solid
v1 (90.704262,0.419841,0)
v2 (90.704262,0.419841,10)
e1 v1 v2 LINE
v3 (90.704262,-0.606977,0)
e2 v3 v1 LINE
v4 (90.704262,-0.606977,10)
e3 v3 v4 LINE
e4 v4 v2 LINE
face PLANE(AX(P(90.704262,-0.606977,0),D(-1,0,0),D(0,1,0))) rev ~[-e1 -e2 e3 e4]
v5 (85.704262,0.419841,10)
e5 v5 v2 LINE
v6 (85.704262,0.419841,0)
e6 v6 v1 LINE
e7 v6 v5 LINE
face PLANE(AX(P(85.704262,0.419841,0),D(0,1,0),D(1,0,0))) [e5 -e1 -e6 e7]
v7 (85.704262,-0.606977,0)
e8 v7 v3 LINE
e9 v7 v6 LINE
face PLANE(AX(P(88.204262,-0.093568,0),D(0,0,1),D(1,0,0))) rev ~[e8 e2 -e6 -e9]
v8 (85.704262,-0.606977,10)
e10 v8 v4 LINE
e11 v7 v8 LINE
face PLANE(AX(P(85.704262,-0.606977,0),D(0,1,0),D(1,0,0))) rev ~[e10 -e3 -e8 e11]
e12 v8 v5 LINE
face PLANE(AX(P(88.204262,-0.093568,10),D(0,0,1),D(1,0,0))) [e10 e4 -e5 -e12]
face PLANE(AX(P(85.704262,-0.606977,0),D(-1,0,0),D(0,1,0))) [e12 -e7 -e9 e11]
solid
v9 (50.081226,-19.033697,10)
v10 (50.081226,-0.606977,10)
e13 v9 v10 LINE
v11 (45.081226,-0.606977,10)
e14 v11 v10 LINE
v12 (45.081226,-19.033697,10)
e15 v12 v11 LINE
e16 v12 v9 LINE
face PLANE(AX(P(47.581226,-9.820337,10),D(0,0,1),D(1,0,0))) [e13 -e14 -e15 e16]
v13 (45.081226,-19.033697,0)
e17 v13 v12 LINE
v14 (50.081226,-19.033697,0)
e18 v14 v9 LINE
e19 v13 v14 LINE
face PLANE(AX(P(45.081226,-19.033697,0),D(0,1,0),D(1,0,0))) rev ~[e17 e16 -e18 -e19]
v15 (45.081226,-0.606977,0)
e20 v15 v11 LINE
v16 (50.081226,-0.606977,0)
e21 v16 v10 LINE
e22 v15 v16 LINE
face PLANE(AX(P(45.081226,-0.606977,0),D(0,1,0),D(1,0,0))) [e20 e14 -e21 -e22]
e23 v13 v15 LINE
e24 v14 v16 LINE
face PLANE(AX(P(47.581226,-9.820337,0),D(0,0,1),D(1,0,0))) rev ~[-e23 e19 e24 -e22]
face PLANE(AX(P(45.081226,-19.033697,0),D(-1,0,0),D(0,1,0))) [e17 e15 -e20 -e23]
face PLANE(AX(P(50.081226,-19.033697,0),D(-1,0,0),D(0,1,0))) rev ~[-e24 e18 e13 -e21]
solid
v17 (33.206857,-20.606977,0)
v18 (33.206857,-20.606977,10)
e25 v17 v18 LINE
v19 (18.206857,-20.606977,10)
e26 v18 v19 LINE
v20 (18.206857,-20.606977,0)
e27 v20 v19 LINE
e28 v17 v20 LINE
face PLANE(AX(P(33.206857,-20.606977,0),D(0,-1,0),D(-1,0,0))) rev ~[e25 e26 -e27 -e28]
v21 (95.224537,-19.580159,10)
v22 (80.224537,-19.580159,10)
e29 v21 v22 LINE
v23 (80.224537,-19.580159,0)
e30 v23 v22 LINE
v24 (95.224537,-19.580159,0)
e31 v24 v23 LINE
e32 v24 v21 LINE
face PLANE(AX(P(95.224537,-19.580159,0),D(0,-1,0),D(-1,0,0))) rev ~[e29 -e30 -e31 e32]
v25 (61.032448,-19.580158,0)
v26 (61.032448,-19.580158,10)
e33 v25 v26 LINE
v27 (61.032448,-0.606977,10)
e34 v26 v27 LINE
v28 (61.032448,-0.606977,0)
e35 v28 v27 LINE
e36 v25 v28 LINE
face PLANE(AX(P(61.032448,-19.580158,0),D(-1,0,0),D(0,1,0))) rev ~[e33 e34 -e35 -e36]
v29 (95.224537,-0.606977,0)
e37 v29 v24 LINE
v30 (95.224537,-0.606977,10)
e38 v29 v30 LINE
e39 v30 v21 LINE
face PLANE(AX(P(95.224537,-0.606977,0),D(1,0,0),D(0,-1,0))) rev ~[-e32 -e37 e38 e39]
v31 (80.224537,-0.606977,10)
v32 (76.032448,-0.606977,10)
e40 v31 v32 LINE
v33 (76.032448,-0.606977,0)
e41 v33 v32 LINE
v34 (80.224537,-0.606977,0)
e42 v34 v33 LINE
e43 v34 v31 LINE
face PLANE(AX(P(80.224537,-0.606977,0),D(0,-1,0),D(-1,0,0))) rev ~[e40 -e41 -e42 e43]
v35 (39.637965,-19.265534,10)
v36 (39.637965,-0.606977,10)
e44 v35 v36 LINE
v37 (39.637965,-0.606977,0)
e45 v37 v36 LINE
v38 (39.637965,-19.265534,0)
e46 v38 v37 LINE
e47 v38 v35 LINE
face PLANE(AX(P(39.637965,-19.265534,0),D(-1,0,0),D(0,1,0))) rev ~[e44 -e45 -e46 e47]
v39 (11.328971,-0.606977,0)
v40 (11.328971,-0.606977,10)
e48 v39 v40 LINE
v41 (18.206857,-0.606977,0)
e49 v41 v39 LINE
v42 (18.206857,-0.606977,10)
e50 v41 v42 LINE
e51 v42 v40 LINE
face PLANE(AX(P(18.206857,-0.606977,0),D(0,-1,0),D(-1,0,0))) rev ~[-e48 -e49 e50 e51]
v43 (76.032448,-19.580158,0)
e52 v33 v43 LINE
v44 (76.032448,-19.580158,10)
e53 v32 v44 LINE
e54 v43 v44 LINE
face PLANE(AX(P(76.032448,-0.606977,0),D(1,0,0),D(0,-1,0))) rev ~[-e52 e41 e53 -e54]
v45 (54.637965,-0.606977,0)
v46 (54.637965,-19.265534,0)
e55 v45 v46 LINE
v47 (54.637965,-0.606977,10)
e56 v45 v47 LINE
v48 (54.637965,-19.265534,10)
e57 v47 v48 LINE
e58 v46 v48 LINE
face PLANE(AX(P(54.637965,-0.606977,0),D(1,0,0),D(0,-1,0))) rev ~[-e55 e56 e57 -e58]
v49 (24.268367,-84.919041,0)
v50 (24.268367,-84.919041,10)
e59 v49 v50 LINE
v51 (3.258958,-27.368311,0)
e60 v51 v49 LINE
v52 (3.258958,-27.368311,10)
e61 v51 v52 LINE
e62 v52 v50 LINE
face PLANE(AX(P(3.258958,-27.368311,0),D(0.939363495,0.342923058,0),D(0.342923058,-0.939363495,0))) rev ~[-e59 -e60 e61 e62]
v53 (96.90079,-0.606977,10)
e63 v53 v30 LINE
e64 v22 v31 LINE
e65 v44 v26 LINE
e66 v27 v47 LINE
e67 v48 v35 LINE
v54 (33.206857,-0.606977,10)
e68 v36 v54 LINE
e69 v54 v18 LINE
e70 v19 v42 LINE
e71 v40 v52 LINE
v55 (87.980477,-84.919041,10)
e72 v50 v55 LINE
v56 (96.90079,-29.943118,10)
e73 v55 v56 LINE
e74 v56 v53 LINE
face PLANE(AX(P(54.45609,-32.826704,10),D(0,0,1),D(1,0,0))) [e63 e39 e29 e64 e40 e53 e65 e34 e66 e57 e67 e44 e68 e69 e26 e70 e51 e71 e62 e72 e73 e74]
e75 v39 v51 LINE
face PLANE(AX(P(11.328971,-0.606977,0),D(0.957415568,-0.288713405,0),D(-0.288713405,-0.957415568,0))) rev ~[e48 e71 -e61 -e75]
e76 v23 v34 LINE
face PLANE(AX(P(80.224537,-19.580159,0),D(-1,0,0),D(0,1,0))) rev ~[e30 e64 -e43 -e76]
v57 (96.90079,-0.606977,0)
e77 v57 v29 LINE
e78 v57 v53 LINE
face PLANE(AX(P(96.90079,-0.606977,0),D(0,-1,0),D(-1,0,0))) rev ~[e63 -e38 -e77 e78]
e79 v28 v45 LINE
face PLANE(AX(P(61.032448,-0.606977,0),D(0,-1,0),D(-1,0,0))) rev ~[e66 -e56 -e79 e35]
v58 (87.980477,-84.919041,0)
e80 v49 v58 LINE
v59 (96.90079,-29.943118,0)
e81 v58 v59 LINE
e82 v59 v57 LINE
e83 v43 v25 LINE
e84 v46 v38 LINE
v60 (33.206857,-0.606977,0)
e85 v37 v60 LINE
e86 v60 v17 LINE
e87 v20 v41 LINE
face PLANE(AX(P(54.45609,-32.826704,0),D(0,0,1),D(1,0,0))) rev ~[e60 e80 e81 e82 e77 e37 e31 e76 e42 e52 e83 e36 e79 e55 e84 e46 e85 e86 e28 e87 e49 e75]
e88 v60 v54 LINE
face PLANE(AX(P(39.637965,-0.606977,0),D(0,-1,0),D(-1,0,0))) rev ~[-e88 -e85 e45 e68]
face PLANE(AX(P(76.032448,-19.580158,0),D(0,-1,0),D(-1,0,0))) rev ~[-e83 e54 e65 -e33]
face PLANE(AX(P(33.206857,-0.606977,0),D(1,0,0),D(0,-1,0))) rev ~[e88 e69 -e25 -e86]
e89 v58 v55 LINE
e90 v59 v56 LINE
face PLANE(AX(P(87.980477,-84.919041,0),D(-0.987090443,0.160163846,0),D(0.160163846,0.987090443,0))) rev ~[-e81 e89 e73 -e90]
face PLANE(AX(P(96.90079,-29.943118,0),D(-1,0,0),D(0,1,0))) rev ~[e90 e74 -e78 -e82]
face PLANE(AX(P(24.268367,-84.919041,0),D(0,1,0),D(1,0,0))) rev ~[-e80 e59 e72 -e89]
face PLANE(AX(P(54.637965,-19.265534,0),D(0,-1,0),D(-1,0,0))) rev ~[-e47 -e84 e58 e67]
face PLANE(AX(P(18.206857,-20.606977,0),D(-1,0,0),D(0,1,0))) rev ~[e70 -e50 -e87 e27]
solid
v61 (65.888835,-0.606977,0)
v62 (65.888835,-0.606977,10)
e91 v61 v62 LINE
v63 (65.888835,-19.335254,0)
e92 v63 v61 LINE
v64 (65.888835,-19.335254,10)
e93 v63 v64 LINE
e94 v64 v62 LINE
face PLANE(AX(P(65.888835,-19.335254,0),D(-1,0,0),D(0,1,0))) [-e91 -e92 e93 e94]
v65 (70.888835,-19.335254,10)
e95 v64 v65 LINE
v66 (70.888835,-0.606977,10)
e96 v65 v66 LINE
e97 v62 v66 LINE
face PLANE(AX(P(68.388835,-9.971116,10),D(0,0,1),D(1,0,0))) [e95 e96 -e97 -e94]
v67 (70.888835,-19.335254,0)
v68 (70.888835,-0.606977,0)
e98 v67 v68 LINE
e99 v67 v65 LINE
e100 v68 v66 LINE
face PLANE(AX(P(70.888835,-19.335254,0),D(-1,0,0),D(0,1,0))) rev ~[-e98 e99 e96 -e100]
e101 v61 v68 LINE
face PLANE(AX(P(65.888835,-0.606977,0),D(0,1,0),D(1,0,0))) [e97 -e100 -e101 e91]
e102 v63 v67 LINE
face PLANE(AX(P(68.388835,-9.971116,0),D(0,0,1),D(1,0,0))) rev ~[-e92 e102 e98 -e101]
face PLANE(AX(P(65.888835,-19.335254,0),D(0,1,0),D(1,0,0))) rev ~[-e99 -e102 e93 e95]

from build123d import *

# Parameters (mm, degrees)
F1_DEPTH = 10
F0_W     = 5
F0_H     = 1.0268185272
F0_H_2   = 18.4267202251
F0_H_3   = 18.7282770615


with BuildPart() as f1:
    # F0 (on Top) → F1 (new body)
    with BuildSketch(Plane.XY):
        Polygon((18.2068565833, -0.6069772576), (11.3289707911, -0.6069772576), (3.2589579517, -27.3683114747), (24.2683672618, -84.9190409688), (87.9804774548, -84.9190409688), (96.9007899468, -29.943118357), (96.9007899468, -0.6069772576), (95.2245366573, -0.6069772576), (95.2245366573, -19.5801587304), (90.7042622566, -19.5801587304), (85.7042622566, -19.5801587304), (80.2245366573, -19.5801587304), (80.2245366573, -0.6069772576), (76.032448262, -0.6069772576), (76.032448262, -19.5801581338), (61.032448262, -19.5801581338), (61.032448262, -0.6069772576), (54.6379645169, -0.6069772576), (54.6379645169, -19.2655338085), (39.6379645169, -19.2655338085), (39.6379645169, -0.6069772576), (33.2068565833, -0.6069772576), (33.2068565833, -20.6069772576), (27.8533260524, -20.6069772576), (22.8533260524, -20.6069772576), (18.2068565833, -20.6069772576), align=None)
    extrude(amount=F1_DEPTH)


with BuildPart() as f1b:
    # F0 (on Top) → F1, piece 2 (new body)
    with BuildSketch(Plane.XY):
        with Locations((88.2042622566, -0.093567994)):
            Rectangle(F0_W, F0_H)
    extrude(amount=F1_DEPTH)


with BuildPart() as f1c:
    # F0 (on Top) → F1, piece 3 (new body)
    with BuildSketch(Plane.XY):
        with Locations((47.5812256336, -9.8203373701)):
            Rectangle(F0_W, F0_H_2)
    extrude(amount=F1_DEPTH)


with BuildPart() as f1d:
    # F0 (on Top) → F1, piece 4 (new body)
    with BuildSketch(Plane.XY):
        with Locations((68.3888345957, -9.9711157883)):
            Rectangle(F0_W, F0_H_3)
    extrude(amount=F1_DEPTH)


solid = Compound([f1.part, f1b.part, f1c.part, f1d.part])
